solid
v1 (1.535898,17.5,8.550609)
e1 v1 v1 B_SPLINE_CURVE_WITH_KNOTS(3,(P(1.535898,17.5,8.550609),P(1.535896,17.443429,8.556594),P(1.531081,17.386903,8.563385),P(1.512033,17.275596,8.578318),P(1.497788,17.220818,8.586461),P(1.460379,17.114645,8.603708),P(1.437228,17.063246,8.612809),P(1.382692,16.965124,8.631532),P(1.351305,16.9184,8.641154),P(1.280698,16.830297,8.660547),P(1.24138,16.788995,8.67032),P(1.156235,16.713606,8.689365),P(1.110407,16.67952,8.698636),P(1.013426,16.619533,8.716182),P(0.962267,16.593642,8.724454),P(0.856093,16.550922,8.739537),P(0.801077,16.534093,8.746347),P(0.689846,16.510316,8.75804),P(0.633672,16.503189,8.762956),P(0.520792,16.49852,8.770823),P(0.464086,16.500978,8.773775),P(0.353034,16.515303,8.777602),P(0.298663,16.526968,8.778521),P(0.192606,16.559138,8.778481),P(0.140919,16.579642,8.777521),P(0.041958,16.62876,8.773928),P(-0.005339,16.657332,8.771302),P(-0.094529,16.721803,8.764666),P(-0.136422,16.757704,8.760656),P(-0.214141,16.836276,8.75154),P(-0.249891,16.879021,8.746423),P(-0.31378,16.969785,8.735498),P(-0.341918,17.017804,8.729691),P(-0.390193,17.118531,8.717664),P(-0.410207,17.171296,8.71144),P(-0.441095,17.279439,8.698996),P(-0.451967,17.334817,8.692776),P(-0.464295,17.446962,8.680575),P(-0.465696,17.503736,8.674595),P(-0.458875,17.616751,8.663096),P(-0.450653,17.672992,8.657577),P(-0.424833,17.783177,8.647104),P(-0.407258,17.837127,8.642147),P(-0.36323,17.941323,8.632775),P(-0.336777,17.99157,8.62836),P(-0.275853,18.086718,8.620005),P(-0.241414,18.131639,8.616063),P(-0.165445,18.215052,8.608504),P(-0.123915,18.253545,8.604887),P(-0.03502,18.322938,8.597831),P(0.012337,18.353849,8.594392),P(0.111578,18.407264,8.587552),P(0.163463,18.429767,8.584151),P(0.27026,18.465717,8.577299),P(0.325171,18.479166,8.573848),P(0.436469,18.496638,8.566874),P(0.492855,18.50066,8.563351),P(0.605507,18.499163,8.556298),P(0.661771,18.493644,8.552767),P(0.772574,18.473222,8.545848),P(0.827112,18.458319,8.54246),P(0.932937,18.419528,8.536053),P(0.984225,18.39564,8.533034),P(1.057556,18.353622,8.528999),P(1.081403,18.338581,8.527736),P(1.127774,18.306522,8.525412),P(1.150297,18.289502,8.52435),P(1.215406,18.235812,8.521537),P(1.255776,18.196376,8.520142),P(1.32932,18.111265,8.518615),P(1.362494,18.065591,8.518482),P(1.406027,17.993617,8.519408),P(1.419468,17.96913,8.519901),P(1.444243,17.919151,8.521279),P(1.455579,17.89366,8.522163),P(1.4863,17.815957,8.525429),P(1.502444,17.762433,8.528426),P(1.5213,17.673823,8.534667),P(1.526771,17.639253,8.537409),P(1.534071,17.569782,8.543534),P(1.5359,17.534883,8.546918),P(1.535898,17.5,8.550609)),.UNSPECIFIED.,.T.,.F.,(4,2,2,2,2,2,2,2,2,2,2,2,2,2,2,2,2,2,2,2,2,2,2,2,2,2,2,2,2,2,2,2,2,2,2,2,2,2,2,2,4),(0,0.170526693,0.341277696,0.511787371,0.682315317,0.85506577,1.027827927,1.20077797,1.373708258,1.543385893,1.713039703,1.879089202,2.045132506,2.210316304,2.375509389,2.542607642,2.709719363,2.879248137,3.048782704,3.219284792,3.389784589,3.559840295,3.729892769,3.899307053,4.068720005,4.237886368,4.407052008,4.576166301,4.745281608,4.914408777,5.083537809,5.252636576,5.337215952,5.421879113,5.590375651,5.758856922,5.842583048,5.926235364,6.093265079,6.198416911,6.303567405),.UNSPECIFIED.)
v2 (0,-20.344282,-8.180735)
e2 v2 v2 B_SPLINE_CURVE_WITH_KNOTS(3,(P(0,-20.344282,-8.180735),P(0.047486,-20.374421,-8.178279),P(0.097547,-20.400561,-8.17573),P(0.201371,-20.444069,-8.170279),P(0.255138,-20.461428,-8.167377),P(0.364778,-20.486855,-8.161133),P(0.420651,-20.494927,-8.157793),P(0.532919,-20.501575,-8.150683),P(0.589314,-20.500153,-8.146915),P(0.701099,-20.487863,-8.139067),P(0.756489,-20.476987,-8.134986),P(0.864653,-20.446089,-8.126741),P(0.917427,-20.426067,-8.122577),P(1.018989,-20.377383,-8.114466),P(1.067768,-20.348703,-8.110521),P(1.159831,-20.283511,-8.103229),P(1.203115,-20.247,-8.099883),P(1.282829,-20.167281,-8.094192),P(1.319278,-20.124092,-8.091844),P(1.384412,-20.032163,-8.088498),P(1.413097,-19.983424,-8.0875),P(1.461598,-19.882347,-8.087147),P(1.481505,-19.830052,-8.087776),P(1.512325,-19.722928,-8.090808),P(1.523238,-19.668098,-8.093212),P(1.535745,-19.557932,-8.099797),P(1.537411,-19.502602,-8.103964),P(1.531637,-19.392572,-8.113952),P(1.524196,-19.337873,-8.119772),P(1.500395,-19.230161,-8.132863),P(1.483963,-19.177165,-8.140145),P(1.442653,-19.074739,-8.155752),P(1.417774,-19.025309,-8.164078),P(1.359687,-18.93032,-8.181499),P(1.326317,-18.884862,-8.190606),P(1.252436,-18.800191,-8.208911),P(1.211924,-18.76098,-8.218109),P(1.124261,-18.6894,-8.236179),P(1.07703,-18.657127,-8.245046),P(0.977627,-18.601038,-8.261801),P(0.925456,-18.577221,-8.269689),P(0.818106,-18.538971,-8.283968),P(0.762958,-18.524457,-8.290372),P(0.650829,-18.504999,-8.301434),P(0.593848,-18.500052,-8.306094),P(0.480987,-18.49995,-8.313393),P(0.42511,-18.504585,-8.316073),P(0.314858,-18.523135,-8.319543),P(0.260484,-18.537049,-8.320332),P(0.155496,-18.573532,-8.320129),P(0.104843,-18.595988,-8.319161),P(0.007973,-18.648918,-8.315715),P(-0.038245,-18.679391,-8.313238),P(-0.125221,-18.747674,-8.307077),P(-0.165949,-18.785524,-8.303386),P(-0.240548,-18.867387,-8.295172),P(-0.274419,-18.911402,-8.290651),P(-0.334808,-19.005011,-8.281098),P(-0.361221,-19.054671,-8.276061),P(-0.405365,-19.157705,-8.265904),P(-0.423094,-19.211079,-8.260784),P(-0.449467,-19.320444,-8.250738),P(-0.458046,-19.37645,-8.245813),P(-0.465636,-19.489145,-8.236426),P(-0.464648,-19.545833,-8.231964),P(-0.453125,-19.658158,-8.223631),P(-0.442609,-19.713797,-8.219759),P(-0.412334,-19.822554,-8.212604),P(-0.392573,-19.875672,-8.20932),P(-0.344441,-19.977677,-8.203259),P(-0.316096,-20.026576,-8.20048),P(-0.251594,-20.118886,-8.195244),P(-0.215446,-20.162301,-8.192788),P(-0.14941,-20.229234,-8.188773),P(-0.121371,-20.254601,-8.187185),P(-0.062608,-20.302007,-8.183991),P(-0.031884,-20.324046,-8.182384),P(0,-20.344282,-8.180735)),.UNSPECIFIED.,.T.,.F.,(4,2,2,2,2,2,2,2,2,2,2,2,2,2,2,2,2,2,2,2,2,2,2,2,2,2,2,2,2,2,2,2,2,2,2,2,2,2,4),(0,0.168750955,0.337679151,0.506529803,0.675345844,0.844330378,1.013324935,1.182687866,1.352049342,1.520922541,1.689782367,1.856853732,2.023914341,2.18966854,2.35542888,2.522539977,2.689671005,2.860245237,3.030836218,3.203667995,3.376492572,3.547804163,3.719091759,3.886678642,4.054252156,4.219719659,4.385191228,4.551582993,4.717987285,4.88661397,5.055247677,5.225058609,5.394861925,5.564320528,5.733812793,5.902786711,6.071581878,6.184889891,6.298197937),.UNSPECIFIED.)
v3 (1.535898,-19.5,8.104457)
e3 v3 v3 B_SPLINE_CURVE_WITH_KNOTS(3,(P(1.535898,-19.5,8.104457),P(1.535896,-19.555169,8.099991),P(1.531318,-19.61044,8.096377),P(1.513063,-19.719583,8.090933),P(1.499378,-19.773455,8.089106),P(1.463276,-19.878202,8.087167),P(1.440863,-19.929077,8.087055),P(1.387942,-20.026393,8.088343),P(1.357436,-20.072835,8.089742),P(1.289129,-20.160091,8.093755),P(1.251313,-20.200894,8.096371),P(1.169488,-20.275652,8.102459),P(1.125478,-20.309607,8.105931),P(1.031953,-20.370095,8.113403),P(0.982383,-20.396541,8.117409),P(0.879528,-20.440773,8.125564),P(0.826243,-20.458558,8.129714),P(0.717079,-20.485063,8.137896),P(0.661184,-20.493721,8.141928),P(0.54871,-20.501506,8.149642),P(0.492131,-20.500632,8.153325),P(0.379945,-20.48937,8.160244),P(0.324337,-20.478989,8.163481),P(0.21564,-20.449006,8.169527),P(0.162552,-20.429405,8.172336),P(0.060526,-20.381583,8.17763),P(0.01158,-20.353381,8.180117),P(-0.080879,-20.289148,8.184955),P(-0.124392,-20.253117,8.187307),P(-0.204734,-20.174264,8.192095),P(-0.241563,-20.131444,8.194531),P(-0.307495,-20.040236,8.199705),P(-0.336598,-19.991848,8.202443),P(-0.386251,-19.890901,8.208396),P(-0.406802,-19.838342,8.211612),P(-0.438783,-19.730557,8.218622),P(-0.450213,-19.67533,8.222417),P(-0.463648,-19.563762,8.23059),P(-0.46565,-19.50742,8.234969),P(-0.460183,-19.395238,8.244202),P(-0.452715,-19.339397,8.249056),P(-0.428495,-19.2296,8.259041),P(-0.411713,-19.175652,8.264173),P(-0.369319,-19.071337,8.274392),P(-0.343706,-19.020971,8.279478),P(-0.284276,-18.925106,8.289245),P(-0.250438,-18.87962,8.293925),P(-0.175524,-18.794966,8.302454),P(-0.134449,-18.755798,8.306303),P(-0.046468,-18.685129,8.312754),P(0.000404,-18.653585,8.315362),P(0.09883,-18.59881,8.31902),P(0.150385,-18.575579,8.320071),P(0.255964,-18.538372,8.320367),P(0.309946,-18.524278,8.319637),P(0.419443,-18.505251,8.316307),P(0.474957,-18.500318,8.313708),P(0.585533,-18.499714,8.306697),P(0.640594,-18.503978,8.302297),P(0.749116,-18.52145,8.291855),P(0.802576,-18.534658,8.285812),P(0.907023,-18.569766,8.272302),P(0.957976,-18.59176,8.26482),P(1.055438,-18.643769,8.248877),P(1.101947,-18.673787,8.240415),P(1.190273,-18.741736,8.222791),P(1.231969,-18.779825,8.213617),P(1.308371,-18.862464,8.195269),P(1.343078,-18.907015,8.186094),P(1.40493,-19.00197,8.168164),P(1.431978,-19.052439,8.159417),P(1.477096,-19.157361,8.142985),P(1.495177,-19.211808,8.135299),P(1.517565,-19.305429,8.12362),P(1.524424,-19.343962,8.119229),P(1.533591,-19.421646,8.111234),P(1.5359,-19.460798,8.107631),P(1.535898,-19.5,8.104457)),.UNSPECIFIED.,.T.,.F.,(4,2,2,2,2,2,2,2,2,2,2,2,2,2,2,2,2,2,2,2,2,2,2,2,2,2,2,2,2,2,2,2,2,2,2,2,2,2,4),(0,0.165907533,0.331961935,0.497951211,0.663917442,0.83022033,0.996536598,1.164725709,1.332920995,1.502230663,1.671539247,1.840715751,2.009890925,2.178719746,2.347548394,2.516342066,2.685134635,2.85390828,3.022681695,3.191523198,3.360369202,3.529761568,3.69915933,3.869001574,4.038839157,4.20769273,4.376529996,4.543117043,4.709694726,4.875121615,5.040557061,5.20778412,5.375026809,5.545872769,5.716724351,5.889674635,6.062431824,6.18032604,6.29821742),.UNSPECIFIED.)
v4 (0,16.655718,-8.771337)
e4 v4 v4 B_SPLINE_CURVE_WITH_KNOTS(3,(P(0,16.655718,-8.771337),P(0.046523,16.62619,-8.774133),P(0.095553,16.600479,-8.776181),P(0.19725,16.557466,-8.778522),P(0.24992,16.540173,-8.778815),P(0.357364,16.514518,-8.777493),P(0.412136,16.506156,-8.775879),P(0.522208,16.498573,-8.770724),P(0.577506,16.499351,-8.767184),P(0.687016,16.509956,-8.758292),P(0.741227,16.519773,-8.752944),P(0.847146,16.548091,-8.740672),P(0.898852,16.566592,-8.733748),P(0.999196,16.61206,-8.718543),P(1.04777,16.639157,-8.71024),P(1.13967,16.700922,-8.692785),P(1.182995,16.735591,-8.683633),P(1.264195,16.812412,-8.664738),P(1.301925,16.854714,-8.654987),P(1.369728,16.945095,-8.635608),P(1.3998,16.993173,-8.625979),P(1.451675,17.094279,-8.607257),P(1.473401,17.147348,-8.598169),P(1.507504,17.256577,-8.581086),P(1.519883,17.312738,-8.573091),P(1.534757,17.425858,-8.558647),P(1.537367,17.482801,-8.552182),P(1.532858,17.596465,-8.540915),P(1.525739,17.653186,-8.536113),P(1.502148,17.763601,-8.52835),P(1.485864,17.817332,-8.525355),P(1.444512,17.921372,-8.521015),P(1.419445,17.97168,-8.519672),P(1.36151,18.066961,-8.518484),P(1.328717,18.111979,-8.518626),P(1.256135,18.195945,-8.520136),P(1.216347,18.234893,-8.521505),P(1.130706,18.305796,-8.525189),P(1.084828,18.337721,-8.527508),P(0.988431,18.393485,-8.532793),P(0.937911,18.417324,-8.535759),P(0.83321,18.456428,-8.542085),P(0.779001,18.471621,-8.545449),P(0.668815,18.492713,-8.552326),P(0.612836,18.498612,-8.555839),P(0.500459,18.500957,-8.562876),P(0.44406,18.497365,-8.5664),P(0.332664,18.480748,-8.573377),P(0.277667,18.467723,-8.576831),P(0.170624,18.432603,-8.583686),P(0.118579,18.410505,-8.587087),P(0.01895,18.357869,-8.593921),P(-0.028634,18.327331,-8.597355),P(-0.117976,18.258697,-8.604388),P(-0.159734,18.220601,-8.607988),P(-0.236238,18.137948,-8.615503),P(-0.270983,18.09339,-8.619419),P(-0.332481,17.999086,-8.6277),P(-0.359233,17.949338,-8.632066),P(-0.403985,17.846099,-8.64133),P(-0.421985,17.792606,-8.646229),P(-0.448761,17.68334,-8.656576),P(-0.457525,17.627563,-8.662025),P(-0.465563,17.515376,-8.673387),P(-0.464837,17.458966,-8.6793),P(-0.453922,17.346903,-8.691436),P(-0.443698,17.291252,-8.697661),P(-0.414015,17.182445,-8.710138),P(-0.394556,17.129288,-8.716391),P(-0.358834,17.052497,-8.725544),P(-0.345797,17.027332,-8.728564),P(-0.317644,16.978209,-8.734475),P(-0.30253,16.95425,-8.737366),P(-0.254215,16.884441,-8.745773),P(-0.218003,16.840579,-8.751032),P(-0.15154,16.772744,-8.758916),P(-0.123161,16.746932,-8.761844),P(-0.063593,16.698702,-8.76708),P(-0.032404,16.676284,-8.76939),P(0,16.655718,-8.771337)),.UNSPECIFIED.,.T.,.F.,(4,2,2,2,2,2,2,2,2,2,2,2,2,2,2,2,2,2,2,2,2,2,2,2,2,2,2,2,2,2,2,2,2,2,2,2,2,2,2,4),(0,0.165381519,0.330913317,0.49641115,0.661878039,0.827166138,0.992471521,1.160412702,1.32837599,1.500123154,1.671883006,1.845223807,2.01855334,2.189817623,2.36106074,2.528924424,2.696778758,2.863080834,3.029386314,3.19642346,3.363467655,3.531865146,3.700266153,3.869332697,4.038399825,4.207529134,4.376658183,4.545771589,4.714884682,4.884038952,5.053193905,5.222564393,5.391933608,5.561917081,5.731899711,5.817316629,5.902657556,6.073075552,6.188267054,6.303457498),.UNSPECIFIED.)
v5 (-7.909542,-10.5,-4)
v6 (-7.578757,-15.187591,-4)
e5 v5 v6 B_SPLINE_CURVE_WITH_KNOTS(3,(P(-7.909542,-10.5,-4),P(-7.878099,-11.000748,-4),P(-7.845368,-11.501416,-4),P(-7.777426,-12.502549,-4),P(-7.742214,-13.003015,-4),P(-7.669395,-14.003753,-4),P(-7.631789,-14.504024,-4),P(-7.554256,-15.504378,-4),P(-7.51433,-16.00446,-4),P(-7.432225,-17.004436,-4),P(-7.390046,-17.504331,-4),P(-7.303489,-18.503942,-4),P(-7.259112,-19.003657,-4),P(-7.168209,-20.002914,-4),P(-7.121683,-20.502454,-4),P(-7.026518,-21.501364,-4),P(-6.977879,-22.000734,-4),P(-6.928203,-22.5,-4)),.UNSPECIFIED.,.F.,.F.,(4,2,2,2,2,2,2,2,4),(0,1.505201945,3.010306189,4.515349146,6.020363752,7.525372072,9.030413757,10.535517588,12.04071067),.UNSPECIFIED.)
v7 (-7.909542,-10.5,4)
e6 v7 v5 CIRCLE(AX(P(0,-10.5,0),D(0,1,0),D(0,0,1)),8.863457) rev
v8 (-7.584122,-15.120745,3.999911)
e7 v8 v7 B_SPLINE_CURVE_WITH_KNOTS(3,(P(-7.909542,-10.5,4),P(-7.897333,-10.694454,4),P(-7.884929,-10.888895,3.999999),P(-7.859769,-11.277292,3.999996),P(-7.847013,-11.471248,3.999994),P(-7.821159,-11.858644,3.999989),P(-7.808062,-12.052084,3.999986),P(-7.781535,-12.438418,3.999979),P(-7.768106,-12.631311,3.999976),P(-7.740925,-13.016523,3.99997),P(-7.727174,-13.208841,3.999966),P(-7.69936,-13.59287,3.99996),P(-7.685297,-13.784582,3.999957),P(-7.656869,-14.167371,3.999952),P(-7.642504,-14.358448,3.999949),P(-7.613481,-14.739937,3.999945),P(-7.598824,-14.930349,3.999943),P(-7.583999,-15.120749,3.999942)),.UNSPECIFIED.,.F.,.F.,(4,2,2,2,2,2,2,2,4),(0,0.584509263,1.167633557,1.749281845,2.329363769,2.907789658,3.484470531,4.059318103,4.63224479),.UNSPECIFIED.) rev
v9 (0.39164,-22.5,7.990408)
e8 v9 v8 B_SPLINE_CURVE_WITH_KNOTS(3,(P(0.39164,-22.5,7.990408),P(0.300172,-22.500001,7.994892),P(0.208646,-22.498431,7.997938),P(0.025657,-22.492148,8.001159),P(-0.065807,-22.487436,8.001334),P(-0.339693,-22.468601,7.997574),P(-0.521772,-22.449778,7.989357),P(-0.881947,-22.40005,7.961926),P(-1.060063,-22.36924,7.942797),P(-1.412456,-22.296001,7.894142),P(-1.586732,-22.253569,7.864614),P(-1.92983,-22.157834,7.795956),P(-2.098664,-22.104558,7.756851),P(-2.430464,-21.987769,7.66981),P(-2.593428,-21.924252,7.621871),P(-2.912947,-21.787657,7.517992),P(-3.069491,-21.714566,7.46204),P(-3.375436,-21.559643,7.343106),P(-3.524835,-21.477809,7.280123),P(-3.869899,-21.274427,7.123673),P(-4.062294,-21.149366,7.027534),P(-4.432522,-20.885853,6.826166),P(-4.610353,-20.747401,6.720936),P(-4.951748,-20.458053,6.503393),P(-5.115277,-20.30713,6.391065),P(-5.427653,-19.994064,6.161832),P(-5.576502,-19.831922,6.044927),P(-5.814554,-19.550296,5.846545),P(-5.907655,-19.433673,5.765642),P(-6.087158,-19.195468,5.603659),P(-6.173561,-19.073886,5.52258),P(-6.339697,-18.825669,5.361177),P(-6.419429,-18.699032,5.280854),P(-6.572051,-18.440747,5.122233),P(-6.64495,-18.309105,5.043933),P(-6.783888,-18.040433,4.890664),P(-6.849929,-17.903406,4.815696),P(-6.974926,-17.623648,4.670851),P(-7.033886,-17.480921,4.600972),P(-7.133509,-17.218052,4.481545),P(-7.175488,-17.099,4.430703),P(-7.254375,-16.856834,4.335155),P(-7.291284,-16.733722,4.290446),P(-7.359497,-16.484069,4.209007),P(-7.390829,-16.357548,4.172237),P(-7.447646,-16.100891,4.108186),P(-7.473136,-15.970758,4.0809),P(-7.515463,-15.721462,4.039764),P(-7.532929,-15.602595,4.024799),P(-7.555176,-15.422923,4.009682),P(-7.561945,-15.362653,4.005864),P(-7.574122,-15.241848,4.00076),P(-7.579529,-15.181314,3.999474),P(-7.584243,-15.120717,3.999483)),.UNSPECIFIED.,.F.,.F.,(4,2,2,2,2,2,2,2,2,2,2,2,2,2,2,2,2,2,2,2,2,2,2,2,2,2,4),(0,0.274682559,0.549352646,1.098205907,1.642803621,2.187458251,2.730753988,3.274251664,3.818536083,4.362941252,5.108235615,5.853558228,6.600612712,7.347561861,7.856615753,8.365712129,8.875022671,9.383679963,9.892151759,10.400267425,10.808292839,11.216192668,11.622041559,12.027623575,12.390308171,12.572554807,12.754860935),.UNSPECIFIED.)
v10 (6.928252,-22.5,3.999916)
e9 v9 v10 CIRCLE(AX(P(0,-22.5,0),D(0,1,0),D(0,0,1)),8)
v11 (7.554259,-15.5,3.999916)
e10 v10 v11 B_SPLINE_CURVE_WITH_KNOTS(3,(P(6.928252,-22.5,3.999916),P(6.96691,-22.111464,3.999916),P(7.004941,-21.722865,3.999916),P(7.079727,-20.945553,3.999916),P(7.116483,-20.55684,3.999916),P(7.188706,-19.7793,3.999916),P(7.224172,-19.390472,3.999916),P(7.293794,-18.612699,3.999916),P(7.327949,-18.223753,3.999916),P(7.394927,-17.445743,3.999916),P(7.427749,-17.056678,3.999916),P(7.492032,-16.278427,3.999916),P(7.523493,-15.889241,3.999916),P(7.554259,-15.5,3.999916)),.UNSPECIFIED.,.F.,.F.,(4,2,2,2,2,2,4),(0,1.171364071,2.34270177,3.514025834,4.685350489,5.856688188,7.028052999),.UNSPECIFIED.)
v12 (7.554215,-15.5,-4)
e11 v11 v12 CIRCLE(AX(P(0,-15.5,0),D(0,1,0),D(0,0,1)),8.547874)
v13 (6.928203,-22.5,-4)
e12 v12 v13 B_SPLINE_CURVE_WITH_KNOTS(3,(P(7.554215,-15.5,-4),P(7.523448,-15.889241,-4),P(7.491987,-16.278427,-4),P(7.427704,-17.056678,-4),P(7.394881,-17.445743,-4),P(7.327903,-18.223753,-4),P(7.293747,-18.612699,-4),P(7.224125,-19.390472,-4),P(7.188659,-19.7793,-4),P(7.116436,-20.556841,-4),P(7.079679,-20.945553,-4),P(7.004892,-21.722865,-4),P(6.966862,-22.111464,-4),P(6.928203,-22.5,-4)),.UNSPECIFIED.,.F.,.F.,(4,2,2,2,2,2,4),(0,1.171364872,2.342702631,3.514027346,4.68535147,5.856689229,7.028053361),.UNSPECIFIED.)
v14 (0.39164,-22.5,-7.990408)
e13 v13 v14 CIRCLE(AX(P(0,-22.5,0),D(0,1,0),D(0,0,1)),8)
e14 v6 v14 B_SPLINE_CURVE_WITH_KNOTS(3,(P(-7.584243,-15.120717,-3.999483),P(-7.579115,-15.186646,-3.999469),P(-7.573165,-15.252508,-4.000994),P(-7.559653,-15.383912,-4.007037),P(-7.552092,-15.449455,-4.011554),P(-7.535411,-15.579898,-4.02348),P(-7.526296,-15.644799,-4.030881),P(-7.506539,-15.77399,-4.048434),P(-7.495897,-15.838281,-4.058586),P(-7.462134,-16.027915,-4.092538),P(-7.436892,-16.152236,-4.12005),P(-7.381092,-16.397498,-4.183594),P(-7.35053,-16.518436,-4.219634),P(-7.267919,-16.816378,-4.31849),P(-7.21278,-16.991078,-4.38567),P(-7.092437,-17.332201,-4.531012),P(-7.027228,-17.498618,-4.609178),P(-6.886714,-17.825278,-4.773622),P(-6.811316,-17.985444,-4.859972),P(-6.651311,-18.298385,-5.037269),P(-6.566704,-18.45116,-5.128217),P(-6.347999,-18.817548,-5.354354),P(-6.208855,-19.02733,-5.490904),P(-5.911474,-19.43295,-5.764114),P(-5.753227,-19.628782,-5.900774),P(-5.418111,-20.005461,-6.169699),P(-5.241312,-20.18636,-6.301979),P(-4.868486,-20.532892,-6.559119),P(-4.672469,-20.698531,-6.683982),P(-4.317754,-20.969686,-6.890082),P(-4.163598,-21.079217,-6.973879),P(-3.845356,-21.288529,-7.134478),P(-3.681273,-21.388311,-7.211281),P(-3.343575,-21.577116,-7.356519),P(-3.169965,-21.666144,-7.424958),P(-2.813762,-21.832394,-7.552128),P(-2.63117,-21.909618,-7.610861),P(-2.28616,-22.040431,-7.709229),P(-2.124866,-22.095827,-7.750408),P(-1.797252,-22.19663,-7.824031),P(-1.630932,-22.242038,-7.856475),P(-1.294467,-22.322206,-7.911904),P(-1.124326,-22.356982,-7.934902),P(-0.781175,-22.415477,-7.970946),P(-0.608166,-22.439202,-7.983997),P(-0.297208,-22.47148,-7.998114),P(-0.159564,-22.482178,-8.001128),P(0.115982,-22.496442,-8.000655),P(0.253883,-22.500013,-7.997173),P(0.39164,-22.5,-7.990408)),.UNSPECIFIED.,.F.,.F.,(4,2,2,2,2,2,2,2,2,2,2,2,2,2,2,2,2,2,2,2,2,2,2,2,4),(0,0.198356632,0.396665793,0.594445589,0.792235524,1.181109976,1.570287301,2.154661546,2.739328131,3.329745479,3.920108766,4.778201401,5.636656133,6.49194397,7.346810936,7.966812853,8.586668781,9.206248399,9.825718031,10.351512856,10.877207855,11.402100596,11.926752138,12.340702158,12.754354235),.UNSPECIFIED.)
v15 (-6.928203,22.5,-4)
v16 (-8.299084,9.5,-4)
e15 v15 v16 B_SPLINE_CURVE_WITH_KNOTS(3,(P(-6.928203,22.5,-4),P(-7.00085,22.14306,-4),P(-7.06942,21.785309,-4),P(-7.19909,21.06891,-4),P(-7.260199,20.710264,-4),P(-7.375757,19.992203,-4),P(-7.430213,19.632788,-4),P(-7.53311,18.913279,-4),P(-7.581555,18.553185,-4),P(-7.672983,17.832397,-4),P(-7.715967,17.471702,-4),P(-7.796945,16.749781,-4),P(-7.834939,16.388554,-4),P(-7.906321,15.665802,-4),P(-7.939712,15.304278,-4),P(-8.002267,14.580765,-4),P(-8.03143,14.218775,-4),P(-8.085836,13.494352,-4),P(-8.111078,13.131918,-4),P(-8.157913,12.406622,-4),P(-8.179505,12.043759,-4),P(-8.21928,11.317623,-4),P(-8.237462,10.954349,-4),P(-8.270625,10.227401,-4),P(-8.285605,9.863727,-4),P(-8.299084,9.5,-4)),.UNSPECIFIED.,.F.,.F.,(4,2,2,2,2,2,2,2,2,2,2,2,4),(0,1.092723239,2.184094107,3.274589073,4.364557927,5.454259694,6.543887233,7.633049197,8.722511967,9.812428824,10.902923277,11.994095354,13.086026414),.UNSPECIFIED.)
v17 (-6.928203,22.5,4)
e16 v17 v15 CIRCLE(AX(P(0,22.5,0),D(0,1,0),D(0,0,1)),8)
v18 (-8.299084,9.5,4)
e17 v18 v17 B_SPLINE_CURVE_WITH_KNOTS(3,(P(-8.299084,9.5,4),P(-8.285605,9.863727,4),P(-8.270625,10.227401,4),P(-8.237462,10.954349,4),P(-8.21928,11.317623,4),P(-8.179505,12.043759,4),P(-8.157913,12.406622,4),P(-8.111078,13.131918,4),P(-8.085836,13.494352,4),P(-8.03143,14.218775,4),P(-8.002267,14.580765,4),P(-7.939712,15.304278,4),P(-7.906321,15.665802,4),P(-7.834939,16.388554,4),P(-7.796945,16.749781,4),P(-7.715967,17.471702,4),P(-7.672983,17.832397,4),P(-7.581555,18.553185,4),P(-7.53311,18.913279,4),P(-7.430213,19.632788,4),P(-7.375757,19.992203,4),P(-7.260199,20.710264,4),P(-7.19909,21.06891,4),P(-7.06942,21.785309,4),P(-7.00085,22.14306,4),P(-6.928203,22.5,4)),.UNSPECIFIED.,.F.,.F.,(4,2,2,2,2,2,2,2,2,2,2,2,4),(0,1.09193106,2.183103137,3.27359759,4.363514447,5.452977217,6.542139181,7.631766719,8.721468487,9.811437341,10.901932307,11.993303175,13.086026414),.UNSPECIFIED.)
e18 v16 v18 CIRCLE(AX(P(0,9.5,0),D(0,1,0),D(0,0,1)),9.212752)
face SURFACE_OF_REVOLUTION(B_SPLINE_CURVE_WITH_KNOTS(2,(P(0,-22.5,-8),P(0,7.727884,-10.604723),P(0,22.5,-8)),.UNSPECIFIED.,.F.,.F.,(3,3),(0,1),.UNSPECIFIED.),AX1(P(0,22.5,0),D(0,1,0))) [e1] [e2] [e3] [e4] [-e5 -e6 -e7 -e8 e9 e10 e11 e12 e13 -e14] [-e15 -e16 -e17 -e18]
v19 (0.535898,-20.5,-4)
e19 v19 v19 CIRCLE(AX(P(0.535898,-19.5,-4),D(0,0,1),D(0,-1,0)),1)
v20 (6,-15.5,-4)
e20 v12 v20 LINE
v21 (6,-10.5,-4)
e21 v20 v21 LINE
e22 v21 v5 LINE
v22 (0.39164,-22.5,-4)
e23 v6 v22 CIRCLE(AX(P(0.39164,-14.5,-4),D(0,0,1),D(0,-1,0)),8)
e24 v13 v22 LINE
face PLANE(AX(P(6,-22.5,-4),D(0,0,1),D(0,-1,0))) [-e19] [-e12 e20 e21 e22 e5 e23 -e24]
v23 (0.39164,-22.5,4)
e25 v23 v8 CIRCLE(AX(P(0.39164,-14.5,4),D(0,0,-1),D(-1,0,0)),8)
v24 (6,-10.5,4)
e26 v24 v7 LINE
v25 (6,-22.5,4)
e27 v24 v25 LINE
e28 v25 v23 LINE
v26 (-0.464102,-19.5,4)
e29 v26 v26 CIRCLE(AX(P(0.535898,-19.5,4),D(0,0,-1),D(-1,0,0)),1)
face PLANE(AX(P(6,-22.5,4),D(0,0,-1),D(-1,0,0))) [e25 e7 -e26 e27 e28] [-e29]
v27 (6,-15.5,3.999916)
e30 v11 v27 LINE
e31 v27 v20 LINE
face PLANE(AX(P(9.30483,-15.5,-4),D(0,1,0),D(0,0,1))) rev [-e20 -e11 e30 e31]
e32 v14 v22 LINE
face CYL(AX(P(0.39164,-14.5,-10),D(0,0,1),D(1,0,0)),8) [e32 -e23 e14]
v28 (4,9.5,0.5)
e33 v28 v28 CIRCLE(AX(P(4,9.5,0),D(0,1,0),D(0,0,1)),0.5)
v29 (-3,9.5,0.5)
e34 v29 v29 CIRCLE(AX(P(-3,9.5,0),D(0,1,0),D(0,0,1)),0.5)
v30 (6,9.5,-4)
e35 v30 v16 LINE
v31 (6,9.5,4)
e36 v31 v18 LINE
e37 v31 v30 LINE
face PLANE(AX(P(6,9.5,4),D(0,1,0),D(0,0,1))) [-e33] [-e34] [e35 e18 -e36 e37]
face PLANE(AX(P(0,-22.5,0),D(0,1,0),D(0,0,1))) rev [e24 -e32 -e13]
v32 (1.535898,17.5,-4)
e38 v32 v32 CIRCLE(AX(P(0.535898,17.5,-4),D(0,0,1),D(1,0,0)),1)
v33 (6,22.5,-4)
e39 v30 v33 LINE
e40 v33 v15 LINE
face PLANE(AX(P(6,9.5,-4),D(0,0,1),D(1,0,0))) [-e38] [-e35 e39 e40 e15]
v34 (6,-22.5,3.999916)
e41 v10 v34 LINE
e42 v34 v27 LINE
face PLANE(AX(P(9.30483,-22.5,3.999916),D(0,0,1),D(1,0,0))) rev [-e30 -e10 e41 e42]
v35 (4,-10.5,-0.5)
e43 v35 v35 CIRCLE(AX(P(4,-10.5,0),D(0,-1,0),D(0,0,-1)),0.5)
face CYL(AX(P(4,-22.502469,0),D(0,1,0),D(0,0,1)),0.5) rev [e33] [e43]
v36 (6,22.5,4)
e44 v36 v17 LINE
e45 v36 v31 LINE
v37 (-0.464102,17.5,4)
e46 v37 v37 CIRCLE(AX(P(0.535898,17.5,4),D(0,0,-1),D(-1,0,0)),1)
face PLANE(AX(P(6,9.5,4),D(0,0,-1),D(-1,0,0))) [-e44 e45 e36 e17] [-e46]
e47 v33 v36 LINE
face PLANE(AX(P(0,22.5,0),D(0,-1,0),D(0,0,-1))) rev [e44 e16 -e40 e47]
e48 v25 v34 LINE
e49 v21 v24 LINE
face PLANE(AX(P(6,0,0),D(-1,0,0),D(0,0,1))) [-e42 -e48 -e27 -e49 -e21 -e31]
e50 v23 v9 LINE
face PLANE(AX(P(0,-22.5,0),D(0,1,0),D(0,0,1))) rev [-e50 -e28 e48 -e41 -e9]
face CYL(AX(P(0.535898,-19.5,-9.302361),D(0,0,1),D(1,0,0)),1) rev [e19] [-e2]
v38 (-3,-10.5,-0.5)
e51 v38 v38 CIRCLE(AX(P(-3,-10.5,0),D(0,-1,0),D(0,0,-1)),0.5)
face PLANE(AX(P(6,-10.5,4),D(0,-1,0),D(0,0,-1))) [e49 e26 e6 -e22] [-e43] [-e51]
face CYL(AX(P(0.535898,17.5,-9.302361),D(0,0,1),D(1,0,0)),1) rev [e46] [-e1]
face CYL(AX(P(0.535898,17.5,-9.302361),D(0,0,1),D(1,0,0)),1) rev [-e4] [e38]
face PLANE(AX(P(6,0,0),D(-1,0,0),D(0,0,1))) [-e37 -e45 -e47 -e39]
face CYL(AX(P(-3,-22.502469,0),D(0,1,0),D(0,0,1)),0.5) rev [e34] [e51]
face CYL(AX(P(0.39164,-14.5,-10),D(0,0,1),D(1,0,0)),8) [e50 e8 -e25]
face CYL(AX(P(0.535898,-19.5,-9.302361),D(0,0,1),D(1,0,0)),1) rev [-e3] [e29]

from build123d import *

# Parameters (mm, degrees)
CUT_EXTRUDE1_DEPTH      = 6
CUT_EXTRUDE1_DEPTH_BACK = 27.06372692
SKETCH2_W               = 8
SKETCH2_H               = 13
SKETCH2_H_2             = 12
CUT_EXTRUDE2_DEPTH      = 27.06372692
CUT_EXTRUDE2_DEPTH_BACK = 27.06372692
SKETCH3_R               = 1
CUT_EXTRUDE4_START      = 10
CUT_EXTRUDE4_DEPTH      = 20
SKETCH7_R               = 0.5
CUT_EXTRUDE5_DEPTH      = 35.598668513
SKETCH8_W               = 7.99991565
SKETCH8_H               = 7
CUT_EXTRUDE6_DEPTH      = 29.756672237


with BuildPart() as part:
    # Sketch1 → Revolve1 (revolve)
    with BuildSketch(Plane(origin=(0, 0, 0), x_dir=(0, 0, -1), z_dir=(1, 0, 0))):
        with BuildLine():
            Line((0, 22.5), (0, -22.5))
            Line((0, -22.5), (8, -22.5))
            add(Edge.make_bspline(
                [(8, 22.5), (10.604722665, 7.727883705), (8, -22.5)],
                knots=[0, 0, 0, 1, 1, 1], degree=2))
            Line((8, 22.5), (0, 22.5))
        make_face()
    revolve(axis=Axis((0, 22.5, 0), (0, -1, 0)))

    # Sketch2 → Cut-Extrude1 (cut, two sides: drawn at the far end of the back side and taken through both)
    with BuildSketch(Plane(origin=(0, 0, 0), x_dir=(0, 0, -1), z_dir=(1, 0, 0)).offset(-CUT_EXTRUDE1_DEPTH_BACK)):
        with Locations((0, 16)):
            Rectangle(SKETCH2_W, SKETCH2_H)
        with Locations((0, -16.5)):
            Rectangle(SKETCH2_W, SKETCH2_H_2)
    extrude(amount=CUT_EXTRUDE1_DEPTH + CUT_EXTRUDE1_DEPTH_BACK, mode=Mode.SUBTRACT)

    # Sketch3 → Cut-Extrude2 (cut, two sides: drawn at the far end of the back side and taken through both)
    with BuildSketch(Plane.XY.offset(-CUT_EXTRUDE2_DEPTH_BACK)):
        with Locations((0.535898385, 17.5)):
            Circle(SKETCH3_R)
        with Locations((0.535898385, -19.5)):
            Circle(SKETCH3_R)
    extrude(amount=CUT_EXTRUDE2_DEPTH + CUT_EXTRUDE2_DEPTH_BACK, mode=Mode.SUBTRACT)

    # Sketch5 → Cut-Extrude4 (cut)
    with BuildSketch(Plane.XY.offset(CUT_EXTRUDE4_START)):
        with BuildLine():
            add(Edge.make_bspline(
                [(-7.584243459, -15.120716805), (-7.392642157, -17.582692325), (-7.172739088, -20.042353376), (-6.92820323, -22.5)],
                knots=[0.384703821, 0.384703821, 0.384703821, 0.384703821, 1, 1, 1, 1], degree=3))
            Line((-6.92820323, -22.5), (0.391639605, -22.5))
            ThreePointArc((0.391639605, -22.5), (-5.041327612, -20.372211442), (-7.584243459, -15.120716805))
        make_face()
    extrude(amount=-CUT_EXTRUDE4_DEPTH, mode=Mode.SUBTRACT)

    # Sketch7 → Cut-Extrude5 (cut, through all)
    with BuildSketch(Plane(origin=(0, 9.5, 0), x_dir=(1, 0, 0), z_dir=(0, 1, 0))):
        with Locations((-3, 0)):
            Circle(SKETCH7_R)
        with Locations((4, 0)):
            Circle(SKETCH7_R)
    extrude(amount=-CUT_EXTRUDE5_DEPTH, mode=Mode.SUBTRACT)

    # Sketch8 → Cut-Extrude6 (cut, through all)
    with BuildSketch(Plane.ZY.offset(-6)):
        with Locations((-4.2175e-05, -19)):
            Rectangle(SKETCH8_W, SKETCH8_H)
    extrude(amount=-CUT_EXTRUDE6_DEPTH, mode=Mode.SUBTRACT)


solid = part.part
